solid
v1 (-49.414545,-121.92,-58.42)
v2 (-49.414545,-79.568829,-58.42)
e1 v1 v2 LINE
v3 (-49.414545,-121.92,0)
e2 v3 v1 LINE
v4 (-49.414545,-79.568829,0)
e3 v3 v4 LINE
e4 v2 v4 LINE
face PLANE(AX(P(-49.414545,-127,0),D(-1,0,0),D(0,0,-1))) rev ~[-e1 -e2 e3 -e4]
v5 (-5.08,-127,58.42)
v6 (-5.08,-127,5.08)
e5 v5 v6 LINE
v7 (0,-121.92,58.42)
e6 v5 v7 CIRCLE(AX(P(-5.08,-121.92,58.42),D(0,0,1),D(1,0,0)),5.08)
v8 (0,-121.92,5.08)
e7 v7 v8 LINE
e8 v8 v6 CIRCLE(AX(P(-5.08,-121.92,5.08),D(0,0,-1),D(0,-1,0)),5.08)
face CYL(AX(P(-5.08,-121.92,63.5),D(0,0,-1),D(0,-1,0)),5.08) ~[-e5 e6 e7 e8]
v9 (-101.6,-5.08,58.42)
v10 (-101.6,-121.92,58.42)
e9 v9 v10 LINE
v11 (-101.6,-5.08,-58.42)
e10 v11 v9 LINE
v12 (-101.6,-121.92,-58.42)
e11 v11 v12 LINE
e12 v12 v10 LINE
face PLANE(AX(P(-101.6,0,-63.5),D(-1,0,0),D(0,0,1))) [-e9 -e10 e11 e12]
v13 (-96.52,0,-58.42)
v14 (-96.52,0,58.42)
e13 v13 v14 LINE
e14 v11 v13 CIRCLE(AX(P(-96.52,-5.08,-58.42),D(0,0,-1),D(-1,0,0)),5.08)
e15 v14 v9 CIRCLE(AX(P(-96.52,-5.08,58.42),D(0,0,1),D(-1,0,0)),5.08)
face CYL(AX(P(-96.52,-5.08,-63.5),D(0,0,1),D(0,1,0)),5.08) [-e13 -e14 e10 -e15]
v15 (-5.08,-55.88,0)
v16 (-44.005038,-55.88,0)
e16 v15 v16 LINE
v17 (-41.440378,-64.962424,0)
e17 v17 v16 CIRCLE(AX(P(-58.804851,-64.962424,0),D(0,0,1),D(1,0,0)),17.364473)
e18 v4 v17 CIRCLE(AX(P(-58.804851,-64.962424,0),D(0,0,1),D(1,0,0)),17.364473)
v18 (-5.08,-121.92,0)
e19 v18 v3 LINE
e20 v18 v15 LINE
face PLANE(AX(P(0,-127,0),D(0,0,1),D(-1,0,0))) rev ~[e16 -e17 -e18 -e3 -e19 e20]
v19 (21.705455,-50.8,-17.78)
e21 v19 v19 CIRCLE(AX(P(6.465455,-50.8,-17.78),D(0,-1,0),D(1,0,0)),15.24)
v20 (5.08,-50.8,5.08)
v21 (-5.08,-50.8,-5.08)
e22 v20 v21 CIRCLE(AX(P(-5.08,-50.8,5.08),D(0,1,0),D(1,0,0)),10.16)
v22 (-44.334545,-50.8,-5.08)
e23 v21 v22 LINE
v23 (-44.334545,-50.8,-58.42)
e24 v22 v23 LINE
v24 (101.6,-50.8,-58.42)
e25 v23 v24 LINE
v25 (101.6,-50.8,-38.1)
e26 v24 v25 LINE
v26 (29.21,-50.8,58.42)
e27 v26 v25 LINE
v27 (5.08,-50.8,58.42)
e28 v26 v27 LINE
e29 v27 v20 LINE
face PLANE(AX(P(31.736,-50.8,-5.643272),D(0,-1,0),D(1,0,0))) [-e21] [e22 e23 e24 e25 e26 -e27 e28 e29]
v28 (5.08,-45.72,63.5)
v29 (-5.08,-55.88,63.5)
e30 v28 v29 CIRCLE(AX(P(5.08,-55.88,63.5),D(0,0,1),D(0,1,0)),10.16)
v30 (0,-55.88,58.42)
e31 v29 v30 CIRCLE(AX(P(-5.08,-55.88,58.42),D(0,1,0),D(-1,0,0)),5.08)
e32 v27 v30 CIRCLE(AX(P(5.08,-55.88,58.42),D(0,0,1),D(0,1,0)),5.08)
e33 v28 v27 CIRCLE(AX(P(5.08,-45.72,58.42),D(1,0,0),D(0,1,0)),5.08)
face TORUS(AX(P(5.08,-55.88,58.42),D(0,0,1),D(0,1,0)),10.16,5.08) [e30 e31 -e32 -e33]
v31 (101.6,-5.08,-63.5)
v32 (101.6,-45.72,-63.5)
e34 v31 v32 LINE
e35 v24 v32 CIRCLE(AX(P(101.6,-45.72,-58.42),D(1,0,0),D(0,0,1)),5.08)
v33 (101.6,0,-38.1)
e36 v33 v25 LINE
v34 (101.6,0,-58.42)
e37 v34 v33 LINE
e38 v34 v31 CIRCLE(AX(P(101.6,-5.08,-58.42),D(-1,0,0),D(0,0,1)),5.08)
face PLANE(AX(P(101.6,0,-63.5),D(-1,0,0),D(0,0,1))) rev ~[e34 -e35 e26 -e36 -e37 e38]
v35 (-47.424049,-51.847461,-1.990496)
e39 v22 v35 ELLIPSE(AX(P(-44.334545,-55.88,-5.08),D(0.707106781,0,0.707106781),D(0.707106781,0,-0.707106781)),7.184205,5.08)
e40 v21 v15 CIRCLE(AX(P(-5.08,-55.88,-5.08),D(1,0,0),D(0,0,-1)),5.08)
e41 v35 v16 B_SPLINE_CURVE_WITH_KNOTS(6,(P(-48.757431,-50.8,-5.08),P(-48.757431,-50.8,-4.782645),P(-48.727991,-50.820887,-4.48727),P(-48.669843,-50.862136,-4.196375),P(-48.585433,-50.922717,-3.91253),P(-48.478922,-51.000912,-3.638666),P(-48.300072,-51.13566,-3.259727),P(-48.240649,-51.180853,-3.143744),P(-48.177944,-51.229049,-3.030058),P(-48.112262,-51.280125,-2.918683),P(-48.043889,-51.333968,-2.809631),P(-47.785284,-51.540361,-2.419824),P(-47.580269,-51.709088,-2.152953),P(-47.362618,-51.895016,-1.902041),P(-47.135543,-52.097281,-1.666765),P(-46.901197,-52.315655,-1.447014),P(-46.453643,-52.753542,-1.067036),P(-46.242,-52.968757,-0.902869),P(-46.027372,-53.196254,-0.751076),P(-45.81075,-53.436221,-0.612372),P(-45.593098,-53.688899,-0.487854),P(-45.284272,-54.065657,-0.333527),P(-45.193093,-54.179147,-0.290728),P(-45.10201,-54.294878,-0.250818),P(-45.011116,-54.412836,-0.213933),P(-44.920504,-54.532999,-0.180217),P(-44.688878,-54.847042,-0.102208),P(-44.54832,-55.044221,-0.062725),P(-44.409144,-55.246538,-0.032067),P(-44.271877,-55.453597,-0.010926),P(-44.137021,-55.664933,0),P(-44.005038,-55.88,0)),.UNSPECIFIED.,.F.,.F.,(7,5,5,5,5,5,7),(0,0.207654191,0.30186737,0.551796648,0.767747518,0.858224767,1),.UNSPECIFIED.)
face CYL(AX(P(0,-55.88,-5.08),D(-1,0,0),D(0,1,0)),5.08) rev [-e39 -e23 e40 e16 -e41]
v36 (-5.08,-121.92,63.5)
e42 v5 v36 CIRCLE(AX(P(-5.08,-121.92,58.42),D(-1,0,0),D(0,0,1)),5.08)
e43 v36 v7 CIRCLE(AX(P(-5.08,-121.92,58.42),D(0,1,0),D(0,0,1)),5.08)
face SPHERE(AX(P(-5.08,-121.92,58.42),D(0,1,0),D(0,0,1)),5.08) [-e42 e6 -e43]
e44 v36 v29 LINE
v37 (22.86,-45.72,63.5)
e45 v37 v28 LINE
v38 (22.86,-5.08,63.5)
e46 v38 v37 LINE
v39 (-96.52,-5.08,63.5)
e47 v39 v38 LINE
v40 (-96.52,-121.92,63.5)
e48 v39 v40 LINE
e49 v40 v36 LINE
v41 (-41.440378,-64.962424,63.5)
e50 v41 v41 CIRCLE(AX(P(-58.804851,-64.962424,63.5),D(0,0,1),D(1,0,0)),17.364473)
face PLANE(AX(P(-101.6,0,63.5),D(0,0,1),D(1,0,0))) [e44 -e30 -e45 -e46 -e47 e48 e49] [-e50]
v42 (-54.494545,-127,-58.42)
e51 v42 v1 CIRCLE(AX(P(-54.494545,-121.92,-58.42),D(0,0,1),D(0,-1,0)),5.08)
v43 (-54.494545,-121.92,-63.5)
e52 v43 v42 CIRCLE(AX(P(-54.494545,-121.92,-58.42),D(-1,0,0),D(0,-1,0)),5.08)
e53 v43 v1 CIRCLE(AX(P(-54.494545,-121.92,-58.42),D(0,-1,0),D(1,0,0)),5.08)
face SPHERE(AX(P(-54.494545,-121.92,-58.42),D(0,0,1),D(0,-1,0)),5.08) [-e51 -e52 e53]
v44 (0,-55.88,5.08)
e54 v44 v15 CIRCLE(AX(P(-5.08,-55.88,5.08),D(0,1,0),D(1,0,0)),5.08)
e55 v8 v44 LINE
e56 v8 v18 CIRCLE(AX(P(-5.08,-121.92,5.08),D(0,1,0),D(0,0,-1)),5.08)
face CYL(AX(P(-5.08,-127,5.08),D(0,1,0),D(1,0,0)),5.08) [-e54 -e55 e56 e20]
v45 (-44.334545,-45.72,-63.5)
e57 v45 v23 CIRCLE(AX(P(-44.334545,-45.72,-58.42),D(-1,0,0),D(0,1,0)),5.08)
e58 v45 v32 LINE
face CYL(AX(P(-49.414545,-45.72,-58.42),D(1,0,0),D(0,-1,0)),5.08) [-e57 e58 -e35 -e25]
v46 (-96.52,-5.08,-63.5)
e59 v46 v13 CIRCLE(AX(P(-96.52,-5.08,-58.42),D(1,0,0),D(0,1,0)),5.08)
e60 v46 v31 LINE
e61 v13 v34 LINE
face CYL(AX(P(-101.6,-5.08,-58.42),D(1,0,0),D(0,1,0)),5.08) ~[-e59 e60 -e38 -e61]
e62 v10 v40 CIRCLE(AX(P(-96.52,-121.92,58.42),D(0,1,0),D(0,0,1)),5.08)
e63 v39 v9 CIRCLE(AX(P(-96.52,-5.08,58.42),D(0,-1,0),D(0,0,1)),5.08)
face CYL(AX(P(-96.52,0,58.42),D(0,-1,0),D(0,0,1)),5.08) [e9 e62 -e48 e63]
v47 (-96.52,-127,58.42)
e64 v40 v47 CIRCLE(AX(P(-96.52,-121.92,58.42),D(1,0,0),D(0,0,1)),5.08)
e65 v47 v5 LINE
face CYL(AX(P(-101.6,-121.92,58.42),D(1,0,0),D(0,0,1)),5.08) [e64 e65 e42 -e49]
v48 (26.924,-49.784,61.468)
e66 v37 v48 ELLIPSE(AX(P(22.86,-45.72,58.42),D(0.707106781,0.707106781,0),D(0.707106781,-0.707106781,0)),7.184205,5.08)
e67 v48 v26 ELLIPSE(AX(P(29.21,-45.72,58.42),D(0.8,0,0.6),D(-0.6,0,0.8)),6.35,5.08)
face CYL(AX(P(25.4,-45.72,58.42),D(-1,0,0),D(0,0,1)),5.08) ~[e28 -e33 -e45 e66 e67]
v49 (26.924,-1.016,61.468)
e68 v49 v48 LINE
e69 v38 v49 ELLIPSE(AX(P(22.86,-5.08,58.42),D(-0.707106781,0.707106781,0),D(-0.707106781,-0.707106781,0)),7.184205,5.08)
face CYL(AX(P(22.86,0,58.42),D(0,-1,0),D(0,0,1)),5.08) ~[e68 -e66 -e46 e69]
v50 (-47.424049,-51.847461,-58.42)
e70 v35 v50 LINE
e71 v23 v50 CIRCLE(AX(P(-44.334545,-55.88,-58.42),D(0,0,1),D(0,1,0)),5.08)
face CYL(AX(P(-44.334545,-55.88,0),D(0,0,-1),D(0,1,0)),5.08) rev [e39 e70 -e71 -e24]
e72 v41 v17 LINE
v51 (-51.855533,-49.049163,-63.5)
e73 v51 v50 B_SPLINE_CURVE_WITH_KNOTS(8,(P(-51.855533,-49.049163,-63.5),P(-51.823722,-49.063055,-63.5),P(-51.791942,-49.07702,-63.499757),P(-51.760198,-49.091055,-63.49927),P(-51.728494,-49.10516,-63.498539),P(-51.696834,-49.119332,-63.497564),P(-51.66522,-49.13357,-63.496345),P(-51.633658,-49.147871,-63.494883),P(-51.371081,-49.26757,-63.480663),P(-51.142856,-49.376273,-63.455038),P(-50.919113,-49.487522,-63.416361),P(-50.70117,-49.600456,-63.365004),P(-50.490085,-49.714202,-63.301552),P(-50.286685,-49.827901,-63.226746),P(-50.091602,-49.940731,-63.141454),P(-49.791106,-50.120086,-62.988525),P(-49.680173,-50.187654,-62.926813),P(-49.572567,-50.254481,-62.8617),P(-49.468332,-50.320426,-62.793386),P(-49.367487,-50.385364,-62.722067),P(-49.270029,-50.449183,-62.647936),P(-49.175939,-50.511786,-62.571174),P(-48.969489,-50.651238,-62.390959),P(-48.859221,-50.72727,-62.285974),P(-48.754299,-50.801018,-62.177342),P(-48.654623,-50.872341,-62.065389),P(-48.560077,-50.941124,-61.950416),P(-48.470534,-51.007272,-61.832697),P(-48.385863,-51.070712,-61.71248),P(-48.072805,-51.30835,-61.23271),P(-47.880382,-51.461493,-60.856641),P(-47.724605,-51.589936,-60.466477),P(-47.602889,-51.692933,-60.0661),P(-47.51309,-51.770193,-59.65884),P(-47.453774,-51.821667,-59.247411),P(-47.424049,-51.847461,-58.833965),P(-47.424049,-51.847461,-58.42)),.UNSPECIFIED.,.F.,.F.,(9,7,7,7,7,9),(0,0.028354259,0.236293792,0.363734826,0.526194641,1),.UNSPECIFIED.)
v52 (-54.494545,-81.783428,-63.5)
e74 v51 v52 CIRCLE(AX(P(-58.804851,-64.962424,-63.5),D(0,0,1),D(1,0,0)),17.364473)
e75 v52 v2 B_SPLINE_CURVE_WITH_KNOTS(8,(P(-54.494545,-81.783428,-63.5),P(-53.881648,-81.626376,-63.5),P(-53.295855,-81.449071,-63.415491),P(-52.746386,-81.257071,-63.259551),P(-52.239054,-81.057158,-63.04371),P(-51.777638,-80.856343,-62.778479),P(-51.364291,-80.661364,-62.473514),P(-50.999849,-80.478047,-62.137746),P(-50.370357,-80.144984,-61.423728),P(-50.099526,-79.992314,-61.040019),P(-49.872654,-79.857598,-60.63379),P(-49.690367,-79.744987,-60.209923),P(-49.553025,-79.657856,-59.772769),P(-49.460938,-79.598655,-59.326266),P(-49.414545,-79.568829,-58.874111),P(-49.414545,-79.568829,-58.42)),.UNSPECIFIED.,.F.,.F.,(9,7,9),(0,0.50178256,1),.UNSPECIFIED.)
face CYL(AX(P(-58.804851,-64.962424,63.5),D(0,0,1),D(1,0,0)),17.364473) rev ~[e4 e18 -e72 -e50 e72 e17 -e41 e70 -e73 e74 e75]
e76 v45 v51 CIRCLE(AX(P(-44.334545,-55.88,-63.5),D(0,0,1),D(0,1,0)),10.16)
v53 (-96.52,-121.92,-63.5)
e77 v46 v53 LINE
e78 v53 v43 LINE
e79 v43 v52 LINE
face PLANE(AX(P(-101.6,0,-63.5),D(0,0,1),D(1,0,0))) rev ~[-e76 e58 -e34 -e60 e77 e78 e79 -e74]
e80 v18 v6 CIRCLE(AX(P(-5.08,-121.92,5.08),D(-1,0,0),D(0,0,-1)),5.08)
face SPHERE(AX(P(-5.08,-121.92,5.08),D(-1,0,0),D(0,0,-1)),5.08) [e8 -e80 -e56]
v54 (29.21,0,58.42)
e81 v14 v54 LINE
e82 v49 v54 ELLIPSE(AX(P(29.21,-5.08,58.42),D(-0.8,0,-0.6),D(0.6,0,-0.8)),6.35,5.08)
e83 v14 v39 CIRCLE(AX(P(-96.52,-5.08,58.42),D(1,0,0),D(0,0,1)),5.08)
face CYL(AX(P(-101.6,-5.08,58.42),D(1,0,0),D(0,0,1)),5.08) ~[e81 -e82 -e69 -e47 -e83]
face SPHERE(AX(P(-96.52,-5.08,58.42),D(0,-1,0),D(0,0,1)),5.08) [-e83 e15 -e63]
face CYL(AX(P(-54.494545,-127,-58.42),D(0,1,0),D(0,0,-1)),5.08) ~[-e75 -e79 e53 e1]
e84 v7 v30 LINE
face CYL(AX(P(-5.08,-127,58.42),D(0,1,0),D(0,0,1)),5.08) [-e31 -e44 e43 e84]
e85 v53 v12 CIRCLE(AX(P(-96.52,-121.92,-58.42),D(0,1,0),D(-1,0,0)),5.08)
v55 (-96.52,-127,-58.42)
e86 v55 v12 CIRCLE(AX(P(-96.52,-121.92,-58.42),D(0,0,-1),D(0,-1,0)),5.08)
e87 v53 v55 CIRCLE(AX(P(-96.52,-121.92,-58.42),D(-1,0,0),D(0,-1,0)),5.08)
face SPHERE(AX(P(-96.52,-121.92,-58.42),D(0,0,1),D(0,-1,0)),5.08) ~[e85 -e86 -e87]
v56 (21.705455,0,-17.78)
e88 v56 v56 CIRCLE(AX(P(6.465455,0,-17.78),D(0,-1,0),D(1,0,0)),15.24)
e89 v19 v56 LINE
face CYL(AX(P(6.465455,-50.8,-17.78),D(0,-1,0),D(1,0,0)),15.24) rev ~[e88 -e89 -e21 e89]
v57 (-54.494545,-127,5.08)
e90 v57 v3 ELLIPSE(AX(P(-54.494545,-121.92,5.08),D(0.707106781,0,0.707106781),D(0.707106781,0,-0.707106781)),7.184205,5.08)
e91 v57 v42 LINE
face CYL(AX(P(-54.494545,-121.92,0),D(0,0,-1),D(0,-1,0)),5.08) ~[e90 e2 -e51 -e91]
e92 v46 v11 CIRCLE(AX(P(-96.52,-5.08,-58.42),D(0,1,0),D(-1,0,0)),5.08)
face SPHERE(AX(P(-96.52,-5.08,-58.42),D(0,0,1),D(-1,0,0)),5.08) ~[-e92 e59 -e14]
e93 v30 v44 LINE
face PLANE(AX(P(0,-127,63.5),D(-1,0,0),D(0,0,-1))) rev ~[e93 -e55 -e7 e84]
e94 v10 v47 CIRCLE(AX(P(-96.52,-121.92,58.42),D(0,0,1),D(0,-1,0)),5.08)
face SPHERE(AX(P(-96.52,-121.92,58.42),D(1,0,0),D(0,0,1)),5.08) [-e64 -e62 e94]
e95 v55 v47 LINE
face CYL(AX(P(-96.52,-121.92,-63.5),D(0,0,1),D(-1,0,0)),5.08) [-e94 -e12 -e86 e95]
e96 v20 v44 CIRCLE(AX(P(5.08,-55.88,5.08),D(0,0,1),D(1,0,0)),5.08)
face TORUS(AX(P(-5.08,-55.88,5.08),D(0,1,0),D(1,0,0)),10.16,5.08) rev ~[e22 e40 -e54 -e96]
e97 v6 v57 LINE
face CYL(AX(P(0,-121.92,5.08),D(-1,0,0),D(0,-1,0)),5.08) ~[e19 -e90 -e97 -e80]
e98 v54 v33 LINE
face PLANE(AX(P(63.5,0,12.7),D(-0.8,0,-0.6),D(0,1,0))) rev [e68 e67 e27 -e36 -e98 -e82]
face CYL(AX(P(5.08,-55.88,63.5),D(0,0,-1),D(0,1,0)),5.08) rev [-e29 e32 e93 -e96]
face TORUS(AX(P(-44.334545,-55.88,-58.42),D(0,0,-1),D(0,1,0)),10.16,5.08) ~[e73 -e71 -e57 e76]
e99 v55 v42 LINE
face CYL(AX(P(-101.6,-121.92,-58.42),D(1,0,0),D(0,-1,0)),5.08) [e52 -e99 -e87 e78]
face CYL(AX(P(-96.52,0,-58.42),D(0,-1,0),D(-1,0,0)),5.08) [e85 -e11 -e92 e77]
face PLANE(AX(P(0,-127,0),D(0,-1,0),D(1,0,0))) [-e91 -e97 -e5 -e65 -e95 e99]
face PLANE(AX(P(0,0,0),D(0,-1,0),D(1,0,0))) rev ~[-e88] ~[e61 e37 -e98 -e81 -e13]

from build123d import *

# Parameters (mm, degrees)
F0_W     = 203.2
F0_H     = 127
F1_DEPTH = 127
F3_DEPTH = 76.2
F4_SIZE2 = 101.6
F4_SIZE  = 76.2
F5_R     = 5.08
F6_R     = 15.24
F7_DEPTH = 50.8
F8_R     = 17.3644725526
F9_DEPTH = 127


with BuildPart() as f1:
    # F0 (on Front) → F1 (new body)
    with BuildSketch(Plane.XZ):
        Rectangle(F0_W, F0_H)
    extrude(amount=F1_DEPTH)

    # F2 (on face) → F3 (cut)
    with BuildSketch(Plane.XZ.offset(127)):
        Polygon((101.6, 63.5), (0, 63.5), (0, 0), (-49.4145452976, 0), (-49.4145452976, -63.5), (101.6, -63.5), align=None)
    extrude(amount=-F3_DEPTH, mode=Mode.SUBTRACT)

    # F4
    f4_edges = [f1.edges().sort_by_distance(p)[0] for p in [
        (101.6, -25.4, 63.5),
    ]]
    f4_side = f1.faces().sort_by_distance((-21.771429, -52.614286, 63.5))[0]
    chamfer(f4_edges, length=F4_SIZE, length2=F4_SIZE2, reference=f4_side)

    # F5
    f5_edges = [f1.edges().sort_by_distance(p)[0] for p in [
        (25.4, -25.4, 63.5),
        (12.7, -50.8, 63.5),
        (0, -88.9, 63.5),
        (-50.8, -127, 63.5),
        (-101.6, -63.5, 63.5),
        (-38.1, 0, 63.5),
        (-101.6, -127, 0),
        (-49.414545, -127, -31.75),
        (-24.707273, -127, 0),
        (0, -88.9, 0),
        (0, -127, 31.75),
        (-75.507273, -127, -63.5),
        (0, -50.8, 31.75),
        (-101.6, 0, 0),
        (-101.6, -63.5, -63.5),
        (0, 0, -63.5),
        (26.092727, -50.8, -63.5),
        (-49.414545, -88.9, -63.5),
        (-49.414545, -50.8, -31.75),
        (-24.707273, -50.8, 0),
    ]]
    fillet(f5_edges, radius=F5_R)

    # F6 (on face) → F7 (cut, through all)
    with BuildSketch(Plane.XZ.offset(50.8)):
        with Locations((6.4654547024, -17.78)):
            Circle(F6_R)
    extrude(amount=-F7_DEPTH, mode=Mode.SUBTRACT)

    # F8 (on face) → F9 (cut, through all)
    with BuildSketch(Plane.XY.offset(63.5)):
        with Locations((-58.8048510253, -64.9624243379)):
            Circle(F8_R)
    extrude(amount=-F9_DEPTH, mode=Mode.SUBTRACT)


solid = f1.part
